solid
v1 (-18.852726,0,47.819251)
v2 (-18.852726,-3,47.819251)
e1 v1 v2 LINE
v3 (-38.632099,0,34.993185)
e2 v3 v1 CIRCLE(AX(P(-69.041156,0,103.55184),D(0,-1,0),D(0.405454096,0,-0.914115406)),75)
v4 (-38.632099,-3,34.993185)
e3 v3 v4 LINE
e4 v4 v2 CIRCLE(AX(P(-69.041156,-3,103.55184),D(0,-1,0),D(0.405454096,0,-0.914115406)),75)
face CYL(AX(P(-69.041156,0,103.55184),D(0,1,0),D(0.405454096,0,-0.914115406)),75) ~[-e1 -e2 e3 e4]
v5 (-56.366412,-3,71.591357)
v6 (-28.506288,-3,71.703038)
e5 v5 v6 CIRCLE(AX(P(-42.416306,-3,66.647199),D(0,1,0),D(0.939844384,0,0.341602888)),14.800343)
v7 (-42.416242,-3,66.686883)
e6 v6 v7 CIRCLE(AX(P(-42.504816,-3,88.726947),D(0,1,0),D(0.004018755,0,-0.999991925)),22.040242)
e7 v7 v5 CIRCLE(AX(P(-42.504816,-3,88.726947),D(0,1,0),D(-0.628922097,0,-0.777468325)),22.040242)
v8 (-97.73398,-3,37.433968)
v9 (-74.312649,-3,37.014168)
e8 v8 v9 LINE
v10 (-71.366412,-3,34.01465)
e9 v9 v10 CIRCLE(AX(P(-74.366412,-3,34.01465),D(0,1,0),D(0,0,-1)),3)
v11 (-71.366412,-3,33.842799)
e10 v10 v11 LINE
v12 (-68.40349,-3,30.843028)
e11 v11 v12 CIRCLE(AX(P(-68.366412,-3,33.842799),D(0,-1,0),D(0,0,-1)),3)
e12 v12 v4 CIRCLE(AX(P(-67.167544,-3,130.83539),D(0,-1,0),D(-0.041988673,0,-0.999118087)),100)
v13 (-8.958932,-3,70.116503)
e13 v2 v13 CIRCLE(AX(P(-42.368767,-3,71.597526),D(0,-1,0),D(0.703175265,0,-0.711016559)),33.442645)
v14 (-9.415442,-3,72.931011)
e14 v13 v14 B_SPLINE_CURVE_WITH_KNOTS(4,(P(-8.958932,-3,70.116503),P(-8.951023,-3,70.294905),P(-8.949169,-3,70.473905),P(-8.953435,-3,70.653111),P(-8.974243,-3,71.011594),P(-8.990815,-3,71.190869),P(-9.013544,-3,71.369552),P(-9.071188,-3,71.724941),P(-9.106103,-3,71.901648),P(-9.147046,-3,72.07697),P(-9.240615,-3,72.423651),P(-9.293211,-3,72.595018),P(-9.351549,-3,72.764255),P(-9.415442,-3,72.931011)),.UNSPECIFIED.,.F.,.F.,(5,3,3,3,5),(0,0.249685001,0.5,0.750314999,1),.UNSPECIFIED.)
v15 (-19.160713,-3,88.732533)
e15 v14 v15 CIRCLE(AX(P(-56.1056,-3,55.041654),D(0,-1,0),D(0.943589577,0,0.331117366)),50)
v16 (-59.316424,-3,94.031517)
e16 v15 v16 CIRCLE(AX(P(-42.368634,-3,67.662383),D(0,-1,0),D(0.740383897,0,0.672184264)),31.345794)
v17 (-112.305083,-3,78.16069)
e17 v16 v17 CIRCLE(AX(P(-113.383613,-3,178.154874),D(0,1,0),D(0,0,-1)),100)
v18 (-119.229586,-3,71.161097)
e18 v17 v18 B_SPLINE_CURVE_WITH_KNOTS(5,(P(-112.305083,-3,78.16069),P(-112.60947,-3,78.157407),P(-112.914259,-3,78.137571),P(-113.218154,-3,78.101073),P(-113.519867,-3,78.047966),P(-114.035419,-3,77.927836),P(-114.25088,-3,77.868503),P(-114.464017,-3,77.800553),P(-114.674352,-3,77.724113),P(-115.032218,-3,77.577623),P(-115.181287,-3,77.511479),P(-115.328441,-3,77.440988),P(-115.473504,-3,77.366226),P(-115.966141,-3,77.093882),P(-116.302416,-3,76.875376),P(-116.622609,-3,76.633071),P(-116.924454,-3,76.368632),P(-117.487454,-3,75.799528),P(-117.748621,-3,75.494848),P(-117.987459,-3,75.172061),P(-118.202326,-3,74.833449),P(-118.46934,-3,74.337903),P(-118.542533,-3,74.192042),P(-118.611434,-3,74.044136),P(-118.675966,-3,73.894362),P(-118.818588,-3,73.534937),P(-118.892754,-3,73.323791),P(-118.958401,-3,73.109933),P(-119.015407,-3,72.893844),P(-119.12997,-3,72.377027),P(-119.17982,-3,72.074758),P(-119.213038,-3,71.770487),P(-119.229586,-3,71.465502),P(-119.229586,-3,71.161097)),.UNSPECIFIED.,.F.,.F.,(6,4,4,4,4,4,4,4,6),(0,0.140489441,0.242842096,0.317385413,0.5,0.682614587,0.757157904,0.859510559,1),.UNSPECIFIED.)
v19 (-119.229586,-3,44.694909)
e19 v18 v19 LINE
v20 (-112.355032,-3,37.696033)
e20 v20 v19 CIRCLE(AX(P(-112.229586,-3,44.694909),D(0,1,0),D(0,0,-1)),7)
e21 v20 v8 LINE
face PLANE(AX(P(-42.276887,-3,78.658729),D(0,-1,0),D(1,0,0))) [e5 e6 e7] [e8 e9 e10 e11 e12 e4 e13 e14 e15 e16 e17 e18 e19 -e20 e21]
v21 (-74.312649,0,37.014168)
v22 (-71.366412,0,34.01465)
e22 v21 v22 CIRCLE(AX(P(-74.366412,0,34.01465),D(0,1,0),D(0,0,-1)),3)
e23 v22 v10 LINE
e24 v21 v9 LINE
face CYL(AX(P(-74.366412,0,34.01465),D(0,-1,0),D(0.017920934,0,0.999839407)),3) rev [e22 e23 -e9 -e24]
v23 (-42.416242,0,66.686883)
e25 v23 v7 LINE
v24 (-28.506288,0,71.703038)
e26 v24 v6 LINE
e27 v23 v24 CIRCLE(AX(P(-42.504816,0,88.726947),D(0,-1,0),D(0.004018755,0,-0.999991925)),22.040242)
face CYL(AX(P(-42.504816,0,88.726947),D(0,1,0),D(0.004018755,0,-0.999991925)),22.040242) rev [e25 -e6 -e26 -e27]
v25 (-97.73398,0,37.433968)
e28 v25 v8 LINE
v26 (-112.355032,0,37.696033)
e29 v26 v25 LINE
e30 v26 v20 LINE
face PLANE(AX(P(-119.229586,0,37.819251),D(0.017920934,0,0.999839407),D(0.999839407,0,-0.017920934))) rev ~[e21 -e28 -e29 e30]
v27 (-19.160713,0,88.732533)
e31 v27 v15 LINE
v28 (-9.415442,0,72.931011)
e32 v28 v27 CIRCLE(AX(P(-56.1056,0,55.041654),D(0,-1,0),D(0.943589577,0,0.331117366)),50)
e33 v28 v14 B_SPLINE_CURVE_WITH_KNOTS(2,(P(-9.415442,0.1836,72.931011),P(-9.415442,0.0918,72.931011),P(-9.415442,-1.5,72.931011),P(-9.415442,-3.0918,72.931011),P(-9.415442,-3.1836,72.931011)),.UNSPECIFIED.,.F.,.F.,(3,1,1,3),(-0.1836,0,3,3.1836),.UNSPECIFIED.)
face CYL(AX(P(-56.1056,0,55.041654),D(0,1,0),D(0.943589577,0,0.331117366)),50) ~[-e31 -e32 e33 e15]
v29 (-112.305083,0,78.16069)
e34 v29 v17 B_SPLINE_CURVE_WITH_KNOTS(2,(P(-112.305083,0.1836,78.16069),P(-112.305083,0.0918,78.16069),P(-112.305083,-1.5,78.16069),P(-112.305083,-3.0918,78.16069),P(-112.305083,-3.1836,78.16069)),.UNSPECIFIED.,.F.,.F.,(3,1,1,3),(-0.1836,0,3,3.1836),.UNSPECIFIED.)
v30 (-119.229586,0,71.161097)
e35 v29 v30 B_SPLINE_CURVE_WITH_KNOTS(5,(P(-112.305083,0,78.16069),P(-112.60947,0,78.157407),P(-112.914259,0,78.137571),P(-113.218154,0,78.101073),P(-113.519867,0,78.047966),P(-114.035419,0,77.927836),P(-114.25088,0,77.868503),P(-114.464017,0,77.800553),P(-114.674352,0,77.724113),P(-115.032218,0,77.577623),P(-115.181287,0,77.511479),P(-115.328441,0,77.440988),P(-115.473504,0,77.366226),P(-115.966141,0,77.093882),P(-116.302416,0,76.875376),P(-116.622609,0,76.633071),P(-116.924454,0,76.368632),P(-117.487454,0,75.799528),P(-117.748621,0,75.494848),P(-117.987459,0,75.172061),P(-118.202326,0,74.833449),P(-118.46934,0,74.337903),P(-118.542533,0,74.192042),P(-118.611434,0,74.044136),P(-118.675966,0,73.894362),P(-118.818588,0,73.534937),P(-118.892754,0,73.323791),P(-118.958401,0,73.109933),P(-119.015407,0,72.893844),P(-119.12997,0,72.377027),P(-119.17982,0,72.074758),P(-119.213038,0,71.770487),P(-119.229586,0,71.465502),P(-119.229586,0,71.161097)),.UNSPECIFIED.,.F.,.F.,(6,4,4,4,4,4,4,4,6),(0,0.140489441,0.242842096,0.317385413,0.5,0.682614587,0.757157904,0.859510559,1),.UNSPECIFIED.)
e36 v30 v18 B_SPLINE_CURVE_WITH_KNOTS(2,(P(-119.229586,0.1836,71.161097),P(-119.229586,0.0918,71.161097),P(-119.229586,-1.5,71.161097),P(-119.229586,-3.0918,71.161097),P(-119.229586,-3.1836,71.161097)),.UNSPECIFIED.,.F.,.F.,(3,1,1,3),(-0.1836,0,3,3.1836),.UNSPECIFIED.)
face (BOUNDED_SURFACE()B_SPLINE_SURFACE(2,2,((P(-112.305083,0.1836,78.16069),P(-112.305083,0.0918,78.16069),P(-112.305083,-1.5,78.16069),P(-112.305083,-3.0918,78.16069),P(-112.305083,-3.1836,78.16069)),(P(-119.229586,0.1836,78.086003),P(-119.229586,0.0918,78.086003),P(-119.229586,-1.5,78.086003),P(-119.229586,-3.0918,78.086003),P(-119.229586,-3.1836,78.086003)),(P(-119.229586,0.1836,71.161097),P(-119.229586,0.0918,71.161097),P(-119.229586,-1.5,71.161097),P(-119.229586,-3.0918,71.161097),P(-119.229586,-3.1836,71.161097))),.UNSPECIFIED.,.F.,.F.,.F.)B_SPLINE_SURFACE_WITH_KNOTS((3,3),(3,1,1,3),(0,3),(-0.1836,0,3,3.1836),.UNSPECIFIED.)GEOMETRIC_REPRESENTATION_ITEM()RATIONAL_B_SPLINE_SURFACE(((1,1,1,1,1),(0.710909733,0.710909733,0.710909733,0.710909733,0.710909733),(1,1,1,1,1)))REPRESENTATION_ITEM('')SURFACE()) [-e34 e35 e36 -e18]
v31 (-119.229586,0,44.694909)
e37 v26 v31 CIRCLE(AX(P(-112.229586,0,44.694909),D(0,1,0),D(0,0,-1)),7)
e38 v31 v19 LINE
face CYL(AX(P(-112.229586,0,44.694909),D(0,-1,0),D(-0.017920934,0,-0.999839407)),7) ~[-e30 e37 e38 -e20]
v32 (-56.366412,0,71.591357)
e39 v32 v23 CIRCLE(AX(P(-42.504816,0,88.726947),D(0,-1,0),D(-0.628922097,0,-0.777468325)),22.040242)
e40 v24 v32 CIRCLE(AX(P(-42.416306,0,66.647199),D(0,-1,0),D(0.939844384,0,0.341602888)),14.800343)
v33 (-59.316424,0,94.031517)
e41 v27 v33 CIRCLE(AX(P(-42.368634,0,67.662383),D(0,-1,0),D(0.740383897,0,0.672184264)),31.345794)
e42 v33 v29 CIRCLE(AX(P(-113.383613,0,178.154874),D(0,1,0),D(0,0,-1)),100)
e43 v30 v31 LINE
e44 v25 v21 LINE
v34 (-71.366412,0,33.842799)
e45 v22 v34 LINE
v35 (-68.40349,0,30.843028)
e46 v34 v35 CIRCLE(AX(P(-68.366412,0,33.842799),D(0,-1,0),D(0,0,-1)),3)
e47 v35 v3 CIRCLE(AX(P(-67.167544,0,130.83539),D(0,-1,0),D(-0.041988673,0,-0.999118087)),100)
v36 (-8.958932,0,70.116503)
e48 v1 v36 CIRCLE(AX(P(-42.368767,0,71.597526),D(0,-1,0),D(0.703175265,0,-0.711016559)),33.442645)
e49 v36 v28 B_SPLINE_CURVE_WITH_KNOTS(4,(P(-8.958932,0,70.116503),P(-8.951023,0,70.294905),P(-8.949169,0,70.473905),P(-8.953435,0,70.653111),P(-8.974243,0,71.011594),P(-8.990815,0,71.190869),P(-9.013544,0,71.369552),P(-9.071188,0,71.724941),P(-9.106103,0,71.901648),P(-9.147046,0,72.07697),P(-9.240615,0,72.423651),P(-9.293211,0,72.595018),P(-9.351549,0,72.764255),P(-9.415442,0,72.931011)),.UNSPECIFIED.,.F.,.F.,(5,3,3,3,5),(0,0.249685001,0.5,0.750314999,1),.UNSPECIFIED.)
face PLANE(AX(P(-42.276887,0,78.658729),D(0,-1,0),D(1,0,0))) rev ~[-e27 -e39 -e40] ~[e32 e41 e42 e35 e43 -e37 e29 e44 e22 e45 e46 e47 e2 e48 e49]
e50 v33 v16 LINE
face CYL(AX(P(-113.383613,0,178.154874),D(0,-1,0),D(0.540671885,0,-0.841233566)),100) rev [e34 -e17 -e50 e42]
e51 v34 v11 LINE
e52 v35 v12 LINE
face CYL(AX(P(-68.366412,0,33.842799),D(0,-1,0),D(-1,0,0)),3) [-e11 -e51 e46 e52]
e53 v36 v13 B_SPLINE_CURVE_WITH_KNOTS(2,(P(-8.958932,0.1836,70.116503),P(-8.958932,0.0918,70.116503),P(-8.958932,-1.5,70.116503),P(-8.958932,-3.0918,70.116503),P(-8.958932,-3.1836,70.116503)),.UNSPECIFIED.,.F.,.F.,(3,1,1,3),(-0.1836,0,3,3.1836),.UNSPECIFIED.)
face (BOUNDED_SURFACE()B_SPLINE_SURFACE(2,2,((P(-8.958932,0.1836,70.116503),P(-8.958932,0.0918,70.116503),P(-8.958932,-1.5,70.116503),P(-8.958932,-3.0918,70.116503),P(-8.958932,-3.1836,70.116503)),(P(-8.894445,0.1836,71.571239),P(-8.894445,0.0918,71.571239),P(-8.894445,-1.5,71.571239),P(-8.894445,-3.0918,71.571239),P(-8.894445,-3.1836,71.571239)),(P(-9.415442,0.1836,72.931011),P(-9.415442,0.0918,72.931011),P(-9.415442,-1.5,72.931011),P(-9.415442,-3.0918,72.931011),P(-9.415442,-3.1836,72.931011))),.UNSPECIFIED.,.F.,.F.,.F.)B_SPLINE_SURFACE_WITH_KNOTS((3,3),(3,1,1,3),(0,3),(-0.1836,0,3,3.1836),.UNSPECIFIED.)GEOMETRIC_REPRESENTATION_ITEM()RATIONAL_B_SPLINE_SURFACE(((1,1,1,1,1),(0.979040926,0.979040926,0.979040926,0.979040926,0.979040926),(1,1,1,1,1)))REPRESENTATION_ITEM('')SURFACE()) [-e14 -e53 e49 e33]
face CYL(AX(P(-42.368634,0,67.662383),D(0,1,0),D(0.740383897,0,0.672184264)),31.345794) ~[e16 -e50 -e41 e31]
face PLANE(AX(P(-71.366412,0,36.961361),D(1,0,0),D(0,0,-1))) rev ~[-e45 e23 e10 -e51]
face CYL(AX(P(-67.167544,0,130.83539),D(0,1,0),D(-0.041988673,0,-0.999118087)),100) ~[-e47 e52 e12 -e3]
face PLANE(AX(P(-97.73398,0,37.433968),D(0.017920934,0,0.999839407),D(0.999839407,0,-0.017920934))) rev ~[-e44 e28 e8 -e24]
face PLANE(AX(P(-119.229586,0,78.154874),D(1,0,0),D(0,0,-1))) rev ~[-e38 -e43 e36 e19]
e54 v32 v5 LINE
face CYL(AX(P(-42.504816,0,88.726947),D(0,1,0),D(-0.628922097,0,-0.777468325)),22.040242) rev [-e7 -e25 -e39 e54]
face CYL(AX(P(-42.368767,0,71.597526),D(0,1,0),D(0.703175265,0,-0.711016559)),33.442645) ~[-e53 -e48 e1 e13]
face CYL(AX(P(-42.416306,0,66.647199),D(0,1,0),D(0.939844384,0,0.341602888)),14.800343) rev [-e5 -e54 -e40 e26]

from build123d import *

# Parameters (mm, degrees)
F1_DEPTH = 3
F2_DEPTH = 25
F3_R     = 7
F4_R     = 100
F5_R     = 7
F6_R     = 3


# Not quite as in the source:
# - a feature names something its author has since deleted; it is built from what else it names


with BuildPart() as f1:
    # F0 (on Front) → F1 (new body)
    with BuildSketch(Plane.XZ):
        with BuildLine():
            Line((-28.5062876117, 71.7030383349), (-23.3711215756, 71.5975238881))
            ThreePointArc((-23.3711215756, 71.5975238881), (-24.6315082315, 75.5227380174), (-26.6928125912, 79.0930187933))
            ThreePointArc((-26.6928125912, 79.0930187933), (-46.4685424733, 86.625019162), (-61.3664115867, 71.5962461648))
            Line((-61.3664115867, 71.5962461648), (-56.3664115867, 71.5913571682))
            ThreePointArc((-56.3664115867, 71.5913571682), (-42.4756351566, 81.447422187), (-28.5062876117, 71.7030383349))
        make_face()
        with BuildLine():
            ThreePointArc((-61.3664115867, 71.5962461648), (-42.3681277411, 52.5998806027), (-23.3711215756, 71.5975238881))
            Line((-23.3711215756, 71.5975238881), (-28.5062876117, 71.7030383349))
            ThreePointArc((-28.5062876117, 71.7030383349), (-35.0280474509, 67.9936357913), (-42.4162418185, 66.6868830915))
            ThreePointArc((-42.4162418185, 66.6868830915), (-49.8149115034, 67.9342855664), (-56.3664115867, 71.5913571682))
            Line((-56.3664115867, 71.5913571682), (-61.3664115867, 71.5962461648))
        make_face()
        with BuildLine():
            ThreePointArc((-42.4162418185, 66.6868830915), (-35.0280474509, 67.9936357913), (-28.5062876117, 71.7030383349))
            ThreePointArc((-28.5062876117, 71.7030383349), (-42.4756351566, 81.447422187), (-56.3664115867, 71.5913571682))
            ThreePointArc((-56.3664115867, 71.5913571682), (-49.8149115034, 67.9342855664), (-42.4162418185, 66.6868830915))
        make_face()
        with BuildLine():
            Line((-20.8711215756, 71.5975236603), (-23.3711215756, 71.5975238881))
            ThreePointArc((-23.3711215756, 71.5975238881), (-42.3681277411, 52.5998806027), (-61.3664115867, 71.5962461648))
            Line((-61.3664115867, 71.5962461648), (-63.866411581, 71.5960777947))
            ThreePointArc((-63.866411581, 71.5960777947), (-63.6941147241, 68.8812286525), (-63.1803487139, 66.2098738354))
            ThreePointArc((-63.1803487139, 66.2098738354), (-48.9397473345, 51.1287456375), (-28.5819229469, 55.1029300277))
            ThreePointArc((-28.5819229469, 55.1029300277), (-22.8939959961, 62.4935676044), (-20.8711215756, 71.5975236602))
        make_face()
        with BuildLine():
            ThreePointArc((-26.6928125912, 79.0930187933), (-24.6315082315, 75.5227380174), (-23.3711215756, 71.5975238881))
            Line((-23.3711215756, 71.5975238881), (-20.8711215756, 71.5975236603))
            ThreePointArc((-20.8711215756, 71.5975236602), (-22.8939959961, 62.4935676044), (-28.5819229469, 55.1029300277))
            ThreePointArc((-28.5819229469, 55.1029300277), (-33.5715090435, 45.0303149316), (-38.6320985636, 34.9931849634))
            ThreePointArc((-38.6320985636, 34.9931849634), (-28.2353261857, 40.6242290748), (-18.8527258187, 47.819251244))
            ThreePointArc((-18.8527258187, 47.819251244), (-11.5073907557, 58.7139707043), (-8.9261215756, 71.5975225718))
            Line((-8.9261215756, 71.5975225718), (-11.6744206899, 71.5975225718))
            Line((-11.6744206899, 71.5975225718), (-11.6744206899, 74.0203762137))
            ThreePointArc((-11.6744206899, 74.0203762137), (-14.431706638, 81.8781100982), (-19.1607128583, 88.7325325952))
            ThreePointArc((-19.1607128583, 88.7325325952), (-48.5320541227, 98.3962580044), (-71.9061774941, 78.1548738354))
            Line((-71.9061774941, 78.1548738354), (-107.2845857728, 78.1548738354))
            Line((-107.2845857728, 78.1548738354), (-119.2295857724, 78.1548738354))
            Line((-119.2295857724, 78.1548738354), (-119.2295857724, 66.2098738355))
            Line((-119.2295857724, 66.2098738355), (-119.2295857724, 47.819251244))
            ThreePointArc((-119.2295857724, 47.819251244), (-113.3445755267, 44.456364285), (-107.2845857724, 41.4201036786))
            Line((-107.2845857724, 41.4201036786), (-107.2845857724, 66.2098738354))
            Line((-107.2845857724, 66.2098738354), (-68.5864427672, 66.2098738354))
            Line((-68.5864427672, 66.2098738354), (-63.1803487138, 66.2098738354))
            ThreePointArc((-63.1803487139, 66.2098738354), (-63.6941147241, 68.8812286525), (-63.866411581, 71.5960777947))
            Line((-63.866411581, 71.5960777947), (-61.3664115867, 71.5962461648))
            ThreePointArc((-61.3664115867, 71.5962461648), (-46.4685424733, 86.625019162), (-26.6928125912, 79.0930187933))
        make_face()
        with BuildLine():
            Line((-11.6744206899, 71.5975225718), (-8.9261215756, 71.5975225718))
            ThreePointArc((-8.9261215756, 71.5975225718), (-13.1797411051, 80.6808937542), (-19.1607128583, 88.7325325952))
            ThreePointArc((-19.1607128583, 88.7325325952), (-14.431706638, 81.8781100982), (-11.6744206899, 74.0203762137))
            Line((-11.6744206899, 74.0203762137), (-11.6744206899, 71.5975225718))
        make_face()
        with BuildLine():
            Line((-119.2295857724, 47.819251244), (-119.2295857724, 37.819251244))
            Line((-119.2295857724, 37.819251244), (-97.7339796794, 37.4339680289))
            ThreePointArc((-97.7339796794, 37.4339680289), (-102.5508909325, 39.3273444167), (-107.2845857724, 41.4201036786))
            ThreePointArc((-107.2845857724, 41.4201036786), (-113.3445755267, 44.456364285), (-119.2295857724, 47.819251244))
        make_face()
        with BuildLine():
            ThreePointArc((-38.6320985636, 34.9931849634), (-33.5715090435, 45.0303149316), (-28.5819229469, 55.1029300277))
            ThreePointArc((-28.5819229469, 55.1029300277), (-48.9397473345, 51.1287456375), (-63.1803487139, 66.2098738354))
            Line((-63.1803487138, 66.2098738354), (-68.5864427672, 66.2098738354))
            Line((-68.5864427672, 66.2098738354), (-107.2845857724, 66.2098738354))
            Line((-107.2845857724, 66.2098738354), (-107.2845857724, 41.4201036786))
            ThreePointArc((-107.2845857724, 41.4201036786), (-102.5508909325, 39.3273444167), (-97.7339796794, 37.4339680289))
            Line((-97.7339796794, 37.4339680289), (-71.3664115866, 36.9613606799))
            Line((-71.3664115866, 36.9613606799), (-71.3664115866, 30.923581687))
            ThreePointArc((-71.3664115866, 30.923581687), (-54.830296618, 31.5993469164), (-38.6320985636, 34.9931849634))
        make_face()
    extrude(amount=F1_DEPTH)

    # F0 (on Front) → F2 (cut)
    with BuildSketch(Plane.XZ):
        with BuildLine():
            ThreePointArc((-42.4162418185, 66.6868830915), (-35.0280474509, 67.9936357913), (-28.5062876117, 71.7030383349))
            ThreePointArc((-28.5062876117, 71.7030383349), (-42.4756351566, 81.447422187), (-56.3664115867, 71.5913571682))
            ThreePointArc((-56.3664115867, 71.5913571682), (-49.8149115034, 67.9342855664), (-42.4162418185, 66.6868830915))
        make_face()
    extrude(amount=F2_DEPTH, mode=Mode.SUBTRACT)

    # F3
    f3_edges = [f1.edges().sort_by_distance(p)[0] for p in [
        (-8.926122, -1.5, 71.597523),
        (-119.229586, -1.5, 37.819251),
    ]]
    fillet(f3_edges, radius=F3_R)

    # F4
    f4_edges = [f1.edges().sort_by_distance(p)[0] for p in [
        (-71.906177, -1.5, 78.154874),
    ]]
    fillet(f4_edges, radius=F4_R)

    # F5
    f5_edges = [f1.edges().sort_by_distance(p)[0] for p in [
        (-119.229586, -1.5, 78.154874),
    ]]
    fillet(f5_edges, radius=F5_R)

    # F6
    f6_edges = [f1.edges().sort_by_distance(p)[0] for p in [
        (-71.366412, -1.5, 36.961361),
        (-71.366412, -1.5, 30.923582),
    ]]
    fillet(f6_edges, radius=F6_R)


solid = f1.part
